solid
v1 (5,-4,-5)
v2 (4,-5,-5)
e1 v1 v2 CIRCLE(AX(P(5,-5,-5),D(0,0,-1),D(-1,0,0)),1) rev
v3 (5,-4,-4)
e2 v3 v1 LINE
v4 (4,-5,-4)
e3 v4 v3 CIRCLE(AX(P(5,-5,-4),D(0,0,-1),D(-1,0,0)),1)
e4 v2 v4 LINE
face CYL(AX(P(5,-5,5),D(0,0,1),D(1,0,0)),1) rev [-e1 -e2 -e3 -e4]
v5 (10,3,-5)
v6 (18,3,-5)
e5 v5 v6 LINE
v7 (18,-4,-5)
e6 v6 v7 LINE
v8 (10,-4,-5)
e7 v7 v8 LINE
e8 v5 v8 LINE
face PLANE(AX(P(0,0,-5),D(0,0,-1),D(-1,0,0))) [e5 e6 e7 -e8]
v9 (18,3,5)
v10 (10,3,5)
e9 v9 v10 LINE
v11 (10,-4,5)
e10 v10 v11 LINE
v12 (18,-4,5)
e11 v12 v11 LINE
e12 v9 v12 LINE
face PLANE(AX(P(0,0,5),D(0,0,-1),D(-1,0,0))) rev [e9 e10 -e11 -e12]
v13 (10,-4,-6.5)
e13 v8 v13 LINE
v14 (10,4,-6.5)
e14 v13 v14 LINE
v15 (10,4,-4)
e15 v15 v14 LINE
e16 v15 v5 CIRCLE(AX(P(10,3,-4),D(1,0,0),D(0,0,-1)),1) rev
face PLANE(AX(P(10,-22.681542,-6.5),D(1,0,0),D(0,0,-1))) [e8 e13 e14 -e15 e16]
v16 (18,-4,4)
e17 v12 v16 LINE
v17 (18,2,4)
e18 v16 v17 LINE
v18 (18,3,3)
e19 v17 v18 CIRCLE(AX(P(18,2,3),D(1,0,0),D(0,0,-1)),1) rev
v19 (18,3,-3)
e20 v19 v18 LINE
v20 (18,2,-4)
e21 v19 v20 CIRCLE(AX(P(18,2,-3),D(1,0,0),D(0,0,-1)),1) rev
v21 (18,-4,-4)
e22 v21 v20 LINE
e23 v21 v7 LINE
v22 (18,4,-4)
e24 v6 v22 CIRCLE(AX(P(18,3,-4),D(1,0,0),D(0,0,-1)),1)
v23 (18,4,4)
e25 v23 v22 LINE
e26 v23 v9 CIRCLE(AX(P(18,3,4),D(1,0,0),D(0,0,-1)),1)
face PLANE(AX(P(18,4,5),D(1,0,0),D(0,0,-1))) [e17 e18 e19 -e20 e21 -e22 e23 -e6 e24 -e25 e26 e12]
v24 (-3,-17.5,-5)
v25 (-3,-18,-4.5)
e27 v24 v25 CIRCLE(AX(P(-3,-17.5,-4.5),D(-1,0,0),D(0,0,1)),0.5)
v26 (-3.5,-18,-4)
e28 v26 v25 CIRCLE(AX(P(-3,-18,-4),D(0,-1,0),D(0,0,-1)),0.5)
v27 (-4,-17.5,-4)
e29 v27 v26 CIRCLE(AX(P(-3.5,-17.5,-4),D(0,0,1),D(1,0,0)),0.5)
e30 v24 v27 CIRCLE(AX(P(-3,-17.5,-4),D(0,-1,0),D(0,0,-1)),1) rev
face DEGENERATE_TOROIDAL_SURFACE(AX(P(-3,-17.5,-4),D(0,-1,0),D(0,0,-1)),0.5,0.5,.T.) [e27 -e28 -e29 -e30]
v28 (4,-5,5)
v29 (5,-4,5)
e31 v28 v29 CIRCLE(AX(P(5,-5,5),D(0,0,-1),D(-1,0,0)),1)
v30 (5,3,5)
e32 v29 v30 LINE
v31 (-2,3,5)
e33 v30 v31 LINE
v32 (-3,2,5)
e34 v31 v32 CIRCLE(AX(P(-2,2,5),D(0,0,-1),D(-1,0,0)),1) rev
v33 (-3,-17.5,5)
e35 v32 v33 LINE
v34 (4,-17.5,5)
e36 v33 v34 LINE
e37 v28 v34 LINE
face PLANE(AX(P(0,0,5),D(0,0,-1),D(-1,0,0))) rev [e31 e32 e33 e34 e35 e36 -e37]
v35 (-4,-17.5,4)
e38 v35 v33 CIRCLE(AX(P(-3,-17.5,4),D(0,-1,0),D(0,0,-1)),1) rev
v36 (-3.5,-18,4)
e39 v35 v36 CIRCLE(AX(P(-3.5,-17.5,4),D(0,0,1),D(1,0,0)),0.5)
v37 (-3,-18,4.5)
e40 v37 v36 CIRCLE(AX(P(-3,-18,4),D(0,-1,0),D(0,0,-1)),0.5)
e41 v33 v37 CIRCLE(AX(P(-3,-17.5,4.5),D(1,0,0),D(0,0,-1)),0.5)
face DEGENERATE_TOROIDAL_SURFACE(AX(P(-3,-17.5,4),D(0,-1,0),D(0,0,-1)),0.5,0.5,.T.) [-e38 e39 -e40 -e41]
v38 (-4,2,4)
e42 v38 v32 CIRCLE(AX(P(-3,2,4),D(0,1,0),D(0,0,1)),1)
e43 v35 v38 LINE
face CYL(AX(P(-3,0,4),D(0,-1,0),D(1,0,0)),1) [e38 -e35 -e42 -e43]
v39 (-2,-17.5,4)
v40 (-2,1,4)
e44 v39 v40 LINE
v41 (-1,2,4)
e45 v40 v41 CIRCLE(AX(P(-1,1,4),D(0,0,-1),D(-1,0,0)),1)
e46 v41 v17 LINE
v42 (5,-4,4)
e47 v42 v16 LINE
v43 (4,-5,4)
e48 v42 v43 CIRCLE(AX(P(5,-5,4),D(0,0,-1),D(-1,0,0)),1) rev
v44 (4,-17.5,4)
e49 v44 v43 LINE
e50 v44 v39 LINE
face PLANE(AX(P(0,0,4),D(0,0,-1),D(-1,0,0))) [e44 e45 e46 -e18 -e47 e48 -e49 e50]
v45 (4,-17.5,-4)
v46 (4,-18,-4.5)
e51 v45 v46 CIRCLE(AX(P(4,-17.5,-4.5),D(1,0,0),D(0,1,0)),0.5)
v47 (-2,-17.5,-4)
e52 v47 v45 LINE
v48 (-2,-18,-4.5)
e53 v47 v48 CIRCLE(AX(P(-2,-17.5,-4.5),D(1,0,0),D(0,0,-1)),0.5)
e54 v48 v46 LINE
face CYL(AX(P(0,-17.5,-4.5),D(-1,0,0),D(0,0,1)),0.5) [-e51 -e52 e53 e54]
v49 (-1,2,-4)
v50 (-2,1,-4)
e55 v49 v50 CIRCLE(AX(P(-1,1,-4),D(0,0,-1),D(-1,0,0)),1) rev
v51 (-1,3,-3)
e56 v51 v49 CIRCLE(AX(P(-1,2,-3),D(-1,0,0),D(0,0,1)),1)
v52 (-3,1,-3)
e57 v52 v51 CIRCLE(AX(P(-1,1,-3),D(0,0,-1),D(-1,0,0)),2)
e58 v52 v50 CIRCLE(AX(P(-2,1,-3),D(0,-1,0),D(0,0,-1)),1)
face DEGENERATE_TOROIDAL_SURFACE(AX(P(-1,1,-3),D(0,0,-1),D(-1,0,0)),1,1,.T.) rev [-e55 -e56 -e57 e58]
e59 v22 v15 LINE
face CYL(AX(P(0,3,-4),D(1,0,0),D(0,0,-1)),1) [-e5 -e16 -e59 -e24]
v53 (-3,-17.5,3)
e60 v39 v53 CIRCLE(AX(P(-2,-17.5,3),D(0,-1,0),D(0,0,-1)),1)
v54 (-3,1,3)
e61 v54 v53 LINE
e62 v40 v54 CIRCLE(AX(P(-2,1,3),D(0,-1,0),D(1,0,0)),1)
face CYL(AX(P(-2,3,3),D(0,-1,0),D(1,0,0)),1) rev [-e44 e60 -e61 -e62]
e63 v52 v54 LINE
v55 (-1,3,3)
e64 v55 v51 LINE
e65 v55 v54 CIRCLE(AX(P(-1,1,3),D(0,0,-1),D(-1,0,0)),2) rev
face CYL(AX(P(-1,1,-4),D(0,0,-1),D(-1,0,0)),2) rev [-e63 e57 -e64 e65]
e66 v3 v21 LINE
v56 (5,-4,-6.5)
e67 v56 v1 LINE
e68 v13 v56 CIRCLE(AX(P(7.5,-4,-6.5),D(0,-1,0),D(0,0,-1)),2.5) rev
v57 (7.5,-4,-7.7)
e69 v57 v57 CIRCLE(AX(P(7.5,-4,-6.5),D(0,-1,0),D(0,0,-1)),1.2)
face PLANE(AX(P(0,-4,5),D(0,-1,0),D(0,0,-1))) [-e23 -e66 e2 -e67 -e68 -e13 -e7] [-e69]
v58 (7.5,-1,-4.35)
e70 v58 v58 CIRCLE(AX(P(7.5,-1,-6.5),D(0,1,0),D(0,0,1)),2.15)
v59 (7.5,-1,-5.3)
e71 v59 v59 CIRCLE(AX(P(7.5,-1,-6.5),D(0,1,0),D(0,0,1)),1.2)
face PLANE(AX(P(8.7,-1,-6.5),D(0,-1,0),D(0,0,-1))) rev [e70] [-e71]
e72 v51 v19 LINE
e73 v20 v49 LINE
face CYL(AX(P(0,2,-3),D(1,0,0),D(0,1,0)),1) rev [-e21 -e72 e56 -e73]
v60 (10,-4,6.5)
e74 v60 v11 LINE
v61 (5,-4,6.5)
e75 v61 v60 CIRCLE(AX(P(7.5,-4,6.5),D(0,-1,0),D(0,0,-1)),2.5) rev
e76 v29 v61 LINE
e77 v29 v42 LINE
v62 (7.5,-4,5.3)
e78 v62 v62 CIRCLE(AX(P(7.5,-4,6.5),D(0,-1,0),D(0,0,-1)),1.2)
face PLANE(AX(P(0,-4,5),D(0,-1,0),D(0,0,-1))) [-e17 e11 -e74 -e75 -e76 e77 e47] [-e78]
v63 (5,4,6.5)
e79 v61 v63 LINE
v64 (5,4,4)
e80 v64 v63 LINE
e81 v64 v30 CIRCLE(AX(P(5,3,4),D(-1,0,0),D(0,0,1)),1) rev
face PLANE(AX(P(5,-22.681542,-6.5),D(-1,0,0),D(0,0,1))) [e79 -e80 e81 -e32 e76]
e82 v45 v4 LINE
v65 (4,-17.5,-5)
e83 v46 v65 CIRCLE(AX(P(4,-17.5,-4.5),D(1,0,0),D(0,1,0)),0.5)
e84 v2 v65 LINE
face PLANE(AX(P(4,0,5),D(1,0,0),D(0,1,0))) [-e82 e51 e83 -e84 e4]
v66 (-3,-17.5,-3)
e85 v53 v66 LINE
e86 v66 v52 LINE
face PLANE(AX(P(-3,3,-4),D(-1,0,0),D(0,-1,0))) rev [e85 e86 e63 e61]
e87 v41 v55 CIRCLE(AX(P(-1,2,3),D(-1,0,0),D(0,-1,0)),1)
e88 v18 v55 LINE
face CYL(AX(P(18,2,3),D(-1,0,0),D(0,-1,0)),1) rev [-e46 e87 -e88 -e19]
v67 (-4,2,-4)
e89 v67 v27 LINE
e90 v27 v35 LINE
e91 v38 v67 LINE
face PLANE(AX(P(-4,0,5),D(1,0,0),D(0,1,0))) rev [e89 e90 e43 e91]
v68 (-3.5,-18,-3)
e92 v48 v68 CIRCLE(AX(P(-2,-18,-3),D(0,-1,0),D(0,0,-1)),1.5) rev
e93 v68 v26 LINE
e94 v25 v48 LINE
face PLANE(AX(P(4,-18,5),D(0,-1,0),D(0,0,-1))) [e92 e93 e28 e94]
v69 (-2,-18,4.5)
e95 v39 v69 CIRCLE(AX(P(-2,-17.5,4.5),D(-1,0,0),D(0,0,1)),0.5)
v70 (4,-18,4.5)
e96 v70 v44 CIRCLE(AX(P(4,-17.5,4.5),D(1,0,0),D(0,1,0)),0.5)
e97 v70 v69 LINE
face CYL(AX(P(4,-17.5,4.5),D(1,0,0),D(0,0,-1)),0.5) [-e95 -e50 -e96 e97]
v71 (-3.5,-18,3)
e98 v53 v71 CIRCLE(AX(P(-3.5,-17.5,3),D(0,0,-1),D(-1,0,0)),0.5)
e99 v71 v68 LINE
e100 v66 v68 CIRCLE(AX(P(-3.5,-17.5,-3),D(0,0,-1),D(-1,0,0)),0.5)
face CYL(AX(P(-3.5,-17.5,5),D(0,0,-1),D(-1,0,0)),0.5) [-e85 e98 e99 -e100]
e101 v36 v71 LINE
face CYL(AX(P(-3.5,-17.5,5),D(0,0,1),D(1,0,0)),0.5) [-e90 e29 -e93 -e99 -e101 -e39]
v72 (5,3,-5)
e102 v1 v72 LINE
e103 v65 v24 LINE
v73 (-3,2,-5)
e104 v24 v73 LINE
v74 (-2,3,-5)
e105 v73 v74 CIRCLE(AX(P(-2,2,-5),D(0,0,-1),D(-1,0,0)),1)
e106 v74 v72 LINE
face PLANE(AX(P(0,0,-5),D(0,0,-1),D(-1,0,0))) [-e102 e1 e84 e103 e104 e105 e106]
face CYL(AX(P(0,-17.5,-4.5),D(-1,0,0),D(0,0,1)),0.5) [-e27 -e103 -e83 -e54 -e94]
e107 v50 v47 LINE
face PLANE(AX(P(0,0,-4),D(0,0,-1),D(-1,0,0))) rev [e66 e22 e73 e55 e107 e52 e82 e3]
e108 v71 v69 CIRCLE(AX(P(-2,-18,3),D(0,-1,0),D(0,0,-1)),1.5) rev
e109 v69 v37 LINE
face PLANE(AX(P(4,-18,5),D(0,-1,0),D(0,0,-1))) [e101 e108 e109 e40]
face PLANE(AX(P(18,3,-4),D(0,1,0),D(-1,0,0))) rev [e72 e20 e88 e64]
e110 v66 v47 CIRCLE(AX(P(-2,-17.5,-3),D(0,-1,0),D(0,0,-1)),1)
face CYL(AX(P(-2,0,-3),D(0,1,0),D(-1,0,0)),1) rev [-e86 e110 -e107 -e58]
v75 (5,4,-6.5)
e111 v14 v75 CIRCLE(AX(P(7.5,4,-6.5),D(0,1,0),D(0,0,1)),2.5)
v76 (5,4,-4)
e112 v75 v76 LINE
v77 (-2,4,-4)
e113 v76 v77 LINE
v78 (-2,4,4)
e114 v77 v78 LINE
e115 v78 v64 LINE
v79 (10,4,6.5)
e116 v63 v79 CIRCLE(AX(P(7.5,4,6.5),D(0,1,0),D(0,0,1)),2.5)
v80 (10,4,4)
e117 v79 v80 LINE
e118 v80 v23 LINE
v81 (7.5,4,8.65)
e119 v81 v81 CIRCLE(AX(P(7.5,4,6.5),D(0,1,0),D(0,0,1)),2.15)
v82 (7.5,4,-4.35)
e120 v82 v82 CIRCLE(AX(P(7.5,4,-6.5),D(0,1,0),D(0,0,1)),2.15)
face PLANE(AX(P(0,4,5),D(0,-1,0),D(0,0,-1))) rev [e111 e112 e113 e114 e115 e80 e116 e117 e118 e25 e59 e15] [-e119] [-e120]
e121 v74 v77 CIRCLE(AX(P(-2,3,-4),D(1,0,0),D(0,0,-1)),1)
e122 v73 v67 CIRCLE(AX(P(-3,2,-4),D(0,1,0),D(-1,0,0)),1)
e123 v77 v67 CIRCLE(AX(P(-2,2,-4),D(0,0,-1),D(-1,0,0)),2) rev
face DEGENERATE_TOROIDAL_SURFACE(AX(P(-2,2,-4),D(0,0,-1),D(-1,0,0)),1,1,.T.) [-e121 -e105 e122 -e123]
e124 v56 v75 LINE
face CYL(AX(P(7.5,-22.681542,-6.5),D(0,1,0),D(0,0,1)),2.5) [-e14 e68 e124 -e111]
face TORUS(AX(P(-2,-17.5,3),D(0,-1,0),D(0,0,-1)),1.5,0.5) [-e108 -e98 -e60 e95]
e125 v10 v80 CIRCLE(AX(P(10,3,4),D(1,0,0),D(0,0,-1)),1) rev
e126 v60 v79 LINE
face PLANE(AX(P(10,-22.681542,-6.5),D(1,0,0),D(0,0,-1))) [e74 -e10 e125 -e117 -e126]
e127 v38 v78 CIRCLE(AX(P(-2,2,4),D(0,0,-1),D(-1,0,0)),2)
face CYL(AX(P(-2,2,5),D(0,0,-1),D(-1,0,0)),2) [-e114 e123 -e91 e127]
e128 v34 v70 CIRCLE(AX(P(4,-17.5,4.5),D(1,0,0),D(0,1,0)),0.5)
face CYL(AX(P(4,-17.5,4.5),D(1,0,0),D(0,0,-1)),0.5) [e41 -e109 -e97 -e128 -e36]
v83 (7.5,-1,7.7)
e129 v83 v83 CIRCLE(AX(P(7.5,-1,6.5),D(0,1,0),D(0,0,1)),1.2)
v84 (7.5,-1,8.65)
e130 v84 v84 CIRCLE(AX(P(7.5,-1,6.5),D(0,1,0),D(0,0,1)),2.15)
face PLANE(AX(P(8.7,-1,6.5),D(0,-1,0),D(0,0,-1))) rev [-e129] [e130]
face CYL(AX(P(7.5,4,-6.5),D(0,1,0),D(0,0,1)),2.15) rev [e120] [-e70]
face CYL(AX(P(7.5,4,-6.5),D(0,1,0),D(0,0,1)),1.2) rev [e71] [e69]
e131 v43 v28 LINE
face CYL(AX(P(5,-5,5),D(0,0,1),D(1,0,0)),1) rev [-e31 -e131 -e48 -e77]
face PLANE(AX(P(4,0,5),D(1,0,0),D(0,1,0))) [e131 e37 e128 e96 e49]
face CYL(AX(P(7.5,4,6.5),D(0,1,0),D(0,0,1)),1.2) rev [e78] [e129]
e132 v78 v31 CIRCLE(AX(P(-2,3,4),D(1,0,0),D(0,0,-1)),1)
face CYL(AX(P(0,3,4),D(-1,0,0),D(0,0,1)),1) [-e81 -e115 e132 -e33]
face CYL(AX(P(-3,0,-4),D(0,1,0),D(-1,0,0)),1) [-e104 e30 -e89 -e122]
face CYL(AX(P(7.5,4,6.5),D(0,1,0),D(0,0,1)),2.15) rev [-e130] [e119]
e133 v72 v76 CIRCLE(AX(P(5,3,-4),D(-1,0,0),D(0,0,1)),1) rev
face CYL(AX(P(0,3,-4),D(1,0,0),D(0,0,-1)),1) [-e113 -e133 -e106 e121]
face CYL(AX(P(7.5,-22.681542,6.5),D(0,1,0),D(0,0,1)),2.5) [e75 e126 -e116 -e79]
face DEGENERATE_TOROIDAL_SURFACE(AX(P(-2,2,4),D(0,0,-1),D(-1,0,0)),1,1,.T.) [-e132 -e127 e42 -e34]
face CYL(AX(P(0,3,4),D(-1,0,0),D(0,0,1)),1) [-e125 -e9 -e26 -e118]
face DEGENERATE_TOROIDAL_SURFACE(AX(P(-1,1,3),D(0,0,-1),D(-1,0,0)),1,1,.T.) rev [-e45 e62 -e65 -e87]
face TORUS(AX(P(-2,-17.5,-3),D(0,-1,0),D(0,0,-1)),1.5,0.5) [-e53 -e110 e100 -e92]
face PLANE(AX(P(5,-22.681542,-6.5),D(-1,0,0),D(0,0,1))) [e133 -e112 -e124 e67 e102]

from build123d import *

# Parameters (mm, degrees)
EXTRUDE_1_DEPTH           = 5
EXTRUDE_1_2_DEPTH         = 8
CUT_EXTRUDE_1_DEPTH       = 4
FILLET_1_R                = 2
HOLE_WIZARD_1_D           = 2.4
HOLE_WIZARD_1_DEPTH       = 15
HOLE_WIZARD_1_CBORE_D     = 4.3
HOLE_WIZARD_1_CBORE_DEPTH = 5
HOLE_WIZARD_1_TIP         = 0.721032743
FILLET_2_R                = 1
FILLET_3_R                = 1
FILLET_4_R                = 1
FILLET_5_R                = 0.5
FILLET_6_R                = 0.5


with BuildPart() as part:
    # 草图1 → Extrude 1 (new, symmetric)
    with BuildSketch(Plane.XY):
        Polygon((4, -18), (4, -4), (18, -4), (18, 4), (-4, 4), (-4, -18), align=None)
    extrude(amount=EXTRUDE_1_DEPTH, both=True)

    # 草图3 → Extrude 1 2 (add)
    with BuildSketch(Plane(origin=(0, 4, 0), x_dir=(1, 0, 0), z_dir=(0, 1, 0))):
        with BuildLine():
            Line((10, 6.5), (10, -6.5))
            ThreePointArc((10, -6.5), (7.5, -9), (5, -6.5))
            Line((5, -6.5), (5, 6.5))
            ThreePointArc((5, 6.5), (7.5, 9), (10, 6.5))
        make_face()
    extrude(amount=-EXTRUDE_1_2_DEPTH)

    # 草图2 → 切除-拉伸1 (cut, symmetric)
    with BuildSketch(Plane.XY):
        Polygon((18, 3), (-3, 3), (-3, -18), (4, -18), (4, -4), (18, -4), align=None)
    extrude(amount=CUT_EXTRUDE_1_DEPTH, both=True, mode=Mode.SUBTRACT)

    # 圆角1
    fillet_1_edges = [part.edges().sort_by_distance(p)[0] for p in [
        (-3, 3, 0),
        (-4, 4, 0),
    ]]
    fillet(fillet_1_edges, radius=FILLET_1_R)

    # 打孔尺寸(%根据)内六角圆柱头螺钉的类型1
    with Locations(Plane(origin=(0, 4, 0), x_dir=(1, 0, 0), z_dir=(0, 1, 0))):
        with Locations((7.5, 6.5), (7.5, -6.5)):
            CounterBoreHole(HOLE_WIZARD_1_D / 2, HOLE_WIZARD_1_CBORE_D / 2, HOLE_WIZARD_1_CBORE_DEPTH, depth=HOLE_WIZARD_1_DEPTH)
            with Locations((0, 0, -(HOLE_WIZARD_1_DEPTH + HOLE_WIZARD_1_TIP / 2))):  # 118° drill point
                Cone(0, HOLE_WIZARD_1_D / 2, HOLE_WIZARD_1_TIP, mode=Mode.SUBTRACT)

    # 圆角2
    fillet_2_edges = [part.edges().sort_by_distance(p)[0] for p in [
        (1.5, 4, -5),
        (1.5, 4, 5),
        (8.5, 3, -4),
        (8.5, 3, 4),
        (-4, -8, -5),
        (-4, -8, 5),
        (-3.414213562, 3.414213562, -5),
        (-3.414213562, 3.414213562, 5),
        (-3, -8.5, 4),
        (-3, -8.5, -4),
        (-2.414213562, 2.414213562, 4),
        (-2.414213562, 2.414213562, -4),
    ]]
    fillet(fillet_2_edges, radius=FILLET_2_R)

    # 圆角3
    fillet_3_edges = [part.edges().sort_by_distance(p)[0] for p in [
        (14, 4, 5),
        (14, 4, -5),
    ]]
    fillet(fillet_3_edges, radius=FILLET_3_R)

    # 圆角4
    fillet_4_edges = [part.edges().sort_by_distance(p)[0] for p in [
        (4, -4, -4.5),
        (4, -4, 4.5),
    ]]
    fillet(fillet_4_edges, radius=FILLET_4_R)

    # 圆角5
    fillet_5_edges = [part.edges().sort_by_distance(p)[0] for p in [
        (-4, -18, 0),
        (-3.707106781, -18, -4.707106781),
        (-3.707106781, -18, 4.707106781),
        (0.5, -18, -5),
        (0.5, -18, 5),
    ]]
    fillet(fillet_5_edges, radius=FILLET_5_R)

    # 圆角6
    fillet_6_edges = [part.edges().sort_by_distance(p)[0] for p in [
        (1, -18, -4),
        (-2.707106781, -18, -3.707106781),
        (1, -18, 4),
        (-2.707106781, -18, 3.707106781),
        (-3, -18, 0),
    ]]
    fillet(fillet_6_edges, radius=FILLET_6_R - 0.0001)  # a hair under: the kernel refuses the full size


solid = part.part
